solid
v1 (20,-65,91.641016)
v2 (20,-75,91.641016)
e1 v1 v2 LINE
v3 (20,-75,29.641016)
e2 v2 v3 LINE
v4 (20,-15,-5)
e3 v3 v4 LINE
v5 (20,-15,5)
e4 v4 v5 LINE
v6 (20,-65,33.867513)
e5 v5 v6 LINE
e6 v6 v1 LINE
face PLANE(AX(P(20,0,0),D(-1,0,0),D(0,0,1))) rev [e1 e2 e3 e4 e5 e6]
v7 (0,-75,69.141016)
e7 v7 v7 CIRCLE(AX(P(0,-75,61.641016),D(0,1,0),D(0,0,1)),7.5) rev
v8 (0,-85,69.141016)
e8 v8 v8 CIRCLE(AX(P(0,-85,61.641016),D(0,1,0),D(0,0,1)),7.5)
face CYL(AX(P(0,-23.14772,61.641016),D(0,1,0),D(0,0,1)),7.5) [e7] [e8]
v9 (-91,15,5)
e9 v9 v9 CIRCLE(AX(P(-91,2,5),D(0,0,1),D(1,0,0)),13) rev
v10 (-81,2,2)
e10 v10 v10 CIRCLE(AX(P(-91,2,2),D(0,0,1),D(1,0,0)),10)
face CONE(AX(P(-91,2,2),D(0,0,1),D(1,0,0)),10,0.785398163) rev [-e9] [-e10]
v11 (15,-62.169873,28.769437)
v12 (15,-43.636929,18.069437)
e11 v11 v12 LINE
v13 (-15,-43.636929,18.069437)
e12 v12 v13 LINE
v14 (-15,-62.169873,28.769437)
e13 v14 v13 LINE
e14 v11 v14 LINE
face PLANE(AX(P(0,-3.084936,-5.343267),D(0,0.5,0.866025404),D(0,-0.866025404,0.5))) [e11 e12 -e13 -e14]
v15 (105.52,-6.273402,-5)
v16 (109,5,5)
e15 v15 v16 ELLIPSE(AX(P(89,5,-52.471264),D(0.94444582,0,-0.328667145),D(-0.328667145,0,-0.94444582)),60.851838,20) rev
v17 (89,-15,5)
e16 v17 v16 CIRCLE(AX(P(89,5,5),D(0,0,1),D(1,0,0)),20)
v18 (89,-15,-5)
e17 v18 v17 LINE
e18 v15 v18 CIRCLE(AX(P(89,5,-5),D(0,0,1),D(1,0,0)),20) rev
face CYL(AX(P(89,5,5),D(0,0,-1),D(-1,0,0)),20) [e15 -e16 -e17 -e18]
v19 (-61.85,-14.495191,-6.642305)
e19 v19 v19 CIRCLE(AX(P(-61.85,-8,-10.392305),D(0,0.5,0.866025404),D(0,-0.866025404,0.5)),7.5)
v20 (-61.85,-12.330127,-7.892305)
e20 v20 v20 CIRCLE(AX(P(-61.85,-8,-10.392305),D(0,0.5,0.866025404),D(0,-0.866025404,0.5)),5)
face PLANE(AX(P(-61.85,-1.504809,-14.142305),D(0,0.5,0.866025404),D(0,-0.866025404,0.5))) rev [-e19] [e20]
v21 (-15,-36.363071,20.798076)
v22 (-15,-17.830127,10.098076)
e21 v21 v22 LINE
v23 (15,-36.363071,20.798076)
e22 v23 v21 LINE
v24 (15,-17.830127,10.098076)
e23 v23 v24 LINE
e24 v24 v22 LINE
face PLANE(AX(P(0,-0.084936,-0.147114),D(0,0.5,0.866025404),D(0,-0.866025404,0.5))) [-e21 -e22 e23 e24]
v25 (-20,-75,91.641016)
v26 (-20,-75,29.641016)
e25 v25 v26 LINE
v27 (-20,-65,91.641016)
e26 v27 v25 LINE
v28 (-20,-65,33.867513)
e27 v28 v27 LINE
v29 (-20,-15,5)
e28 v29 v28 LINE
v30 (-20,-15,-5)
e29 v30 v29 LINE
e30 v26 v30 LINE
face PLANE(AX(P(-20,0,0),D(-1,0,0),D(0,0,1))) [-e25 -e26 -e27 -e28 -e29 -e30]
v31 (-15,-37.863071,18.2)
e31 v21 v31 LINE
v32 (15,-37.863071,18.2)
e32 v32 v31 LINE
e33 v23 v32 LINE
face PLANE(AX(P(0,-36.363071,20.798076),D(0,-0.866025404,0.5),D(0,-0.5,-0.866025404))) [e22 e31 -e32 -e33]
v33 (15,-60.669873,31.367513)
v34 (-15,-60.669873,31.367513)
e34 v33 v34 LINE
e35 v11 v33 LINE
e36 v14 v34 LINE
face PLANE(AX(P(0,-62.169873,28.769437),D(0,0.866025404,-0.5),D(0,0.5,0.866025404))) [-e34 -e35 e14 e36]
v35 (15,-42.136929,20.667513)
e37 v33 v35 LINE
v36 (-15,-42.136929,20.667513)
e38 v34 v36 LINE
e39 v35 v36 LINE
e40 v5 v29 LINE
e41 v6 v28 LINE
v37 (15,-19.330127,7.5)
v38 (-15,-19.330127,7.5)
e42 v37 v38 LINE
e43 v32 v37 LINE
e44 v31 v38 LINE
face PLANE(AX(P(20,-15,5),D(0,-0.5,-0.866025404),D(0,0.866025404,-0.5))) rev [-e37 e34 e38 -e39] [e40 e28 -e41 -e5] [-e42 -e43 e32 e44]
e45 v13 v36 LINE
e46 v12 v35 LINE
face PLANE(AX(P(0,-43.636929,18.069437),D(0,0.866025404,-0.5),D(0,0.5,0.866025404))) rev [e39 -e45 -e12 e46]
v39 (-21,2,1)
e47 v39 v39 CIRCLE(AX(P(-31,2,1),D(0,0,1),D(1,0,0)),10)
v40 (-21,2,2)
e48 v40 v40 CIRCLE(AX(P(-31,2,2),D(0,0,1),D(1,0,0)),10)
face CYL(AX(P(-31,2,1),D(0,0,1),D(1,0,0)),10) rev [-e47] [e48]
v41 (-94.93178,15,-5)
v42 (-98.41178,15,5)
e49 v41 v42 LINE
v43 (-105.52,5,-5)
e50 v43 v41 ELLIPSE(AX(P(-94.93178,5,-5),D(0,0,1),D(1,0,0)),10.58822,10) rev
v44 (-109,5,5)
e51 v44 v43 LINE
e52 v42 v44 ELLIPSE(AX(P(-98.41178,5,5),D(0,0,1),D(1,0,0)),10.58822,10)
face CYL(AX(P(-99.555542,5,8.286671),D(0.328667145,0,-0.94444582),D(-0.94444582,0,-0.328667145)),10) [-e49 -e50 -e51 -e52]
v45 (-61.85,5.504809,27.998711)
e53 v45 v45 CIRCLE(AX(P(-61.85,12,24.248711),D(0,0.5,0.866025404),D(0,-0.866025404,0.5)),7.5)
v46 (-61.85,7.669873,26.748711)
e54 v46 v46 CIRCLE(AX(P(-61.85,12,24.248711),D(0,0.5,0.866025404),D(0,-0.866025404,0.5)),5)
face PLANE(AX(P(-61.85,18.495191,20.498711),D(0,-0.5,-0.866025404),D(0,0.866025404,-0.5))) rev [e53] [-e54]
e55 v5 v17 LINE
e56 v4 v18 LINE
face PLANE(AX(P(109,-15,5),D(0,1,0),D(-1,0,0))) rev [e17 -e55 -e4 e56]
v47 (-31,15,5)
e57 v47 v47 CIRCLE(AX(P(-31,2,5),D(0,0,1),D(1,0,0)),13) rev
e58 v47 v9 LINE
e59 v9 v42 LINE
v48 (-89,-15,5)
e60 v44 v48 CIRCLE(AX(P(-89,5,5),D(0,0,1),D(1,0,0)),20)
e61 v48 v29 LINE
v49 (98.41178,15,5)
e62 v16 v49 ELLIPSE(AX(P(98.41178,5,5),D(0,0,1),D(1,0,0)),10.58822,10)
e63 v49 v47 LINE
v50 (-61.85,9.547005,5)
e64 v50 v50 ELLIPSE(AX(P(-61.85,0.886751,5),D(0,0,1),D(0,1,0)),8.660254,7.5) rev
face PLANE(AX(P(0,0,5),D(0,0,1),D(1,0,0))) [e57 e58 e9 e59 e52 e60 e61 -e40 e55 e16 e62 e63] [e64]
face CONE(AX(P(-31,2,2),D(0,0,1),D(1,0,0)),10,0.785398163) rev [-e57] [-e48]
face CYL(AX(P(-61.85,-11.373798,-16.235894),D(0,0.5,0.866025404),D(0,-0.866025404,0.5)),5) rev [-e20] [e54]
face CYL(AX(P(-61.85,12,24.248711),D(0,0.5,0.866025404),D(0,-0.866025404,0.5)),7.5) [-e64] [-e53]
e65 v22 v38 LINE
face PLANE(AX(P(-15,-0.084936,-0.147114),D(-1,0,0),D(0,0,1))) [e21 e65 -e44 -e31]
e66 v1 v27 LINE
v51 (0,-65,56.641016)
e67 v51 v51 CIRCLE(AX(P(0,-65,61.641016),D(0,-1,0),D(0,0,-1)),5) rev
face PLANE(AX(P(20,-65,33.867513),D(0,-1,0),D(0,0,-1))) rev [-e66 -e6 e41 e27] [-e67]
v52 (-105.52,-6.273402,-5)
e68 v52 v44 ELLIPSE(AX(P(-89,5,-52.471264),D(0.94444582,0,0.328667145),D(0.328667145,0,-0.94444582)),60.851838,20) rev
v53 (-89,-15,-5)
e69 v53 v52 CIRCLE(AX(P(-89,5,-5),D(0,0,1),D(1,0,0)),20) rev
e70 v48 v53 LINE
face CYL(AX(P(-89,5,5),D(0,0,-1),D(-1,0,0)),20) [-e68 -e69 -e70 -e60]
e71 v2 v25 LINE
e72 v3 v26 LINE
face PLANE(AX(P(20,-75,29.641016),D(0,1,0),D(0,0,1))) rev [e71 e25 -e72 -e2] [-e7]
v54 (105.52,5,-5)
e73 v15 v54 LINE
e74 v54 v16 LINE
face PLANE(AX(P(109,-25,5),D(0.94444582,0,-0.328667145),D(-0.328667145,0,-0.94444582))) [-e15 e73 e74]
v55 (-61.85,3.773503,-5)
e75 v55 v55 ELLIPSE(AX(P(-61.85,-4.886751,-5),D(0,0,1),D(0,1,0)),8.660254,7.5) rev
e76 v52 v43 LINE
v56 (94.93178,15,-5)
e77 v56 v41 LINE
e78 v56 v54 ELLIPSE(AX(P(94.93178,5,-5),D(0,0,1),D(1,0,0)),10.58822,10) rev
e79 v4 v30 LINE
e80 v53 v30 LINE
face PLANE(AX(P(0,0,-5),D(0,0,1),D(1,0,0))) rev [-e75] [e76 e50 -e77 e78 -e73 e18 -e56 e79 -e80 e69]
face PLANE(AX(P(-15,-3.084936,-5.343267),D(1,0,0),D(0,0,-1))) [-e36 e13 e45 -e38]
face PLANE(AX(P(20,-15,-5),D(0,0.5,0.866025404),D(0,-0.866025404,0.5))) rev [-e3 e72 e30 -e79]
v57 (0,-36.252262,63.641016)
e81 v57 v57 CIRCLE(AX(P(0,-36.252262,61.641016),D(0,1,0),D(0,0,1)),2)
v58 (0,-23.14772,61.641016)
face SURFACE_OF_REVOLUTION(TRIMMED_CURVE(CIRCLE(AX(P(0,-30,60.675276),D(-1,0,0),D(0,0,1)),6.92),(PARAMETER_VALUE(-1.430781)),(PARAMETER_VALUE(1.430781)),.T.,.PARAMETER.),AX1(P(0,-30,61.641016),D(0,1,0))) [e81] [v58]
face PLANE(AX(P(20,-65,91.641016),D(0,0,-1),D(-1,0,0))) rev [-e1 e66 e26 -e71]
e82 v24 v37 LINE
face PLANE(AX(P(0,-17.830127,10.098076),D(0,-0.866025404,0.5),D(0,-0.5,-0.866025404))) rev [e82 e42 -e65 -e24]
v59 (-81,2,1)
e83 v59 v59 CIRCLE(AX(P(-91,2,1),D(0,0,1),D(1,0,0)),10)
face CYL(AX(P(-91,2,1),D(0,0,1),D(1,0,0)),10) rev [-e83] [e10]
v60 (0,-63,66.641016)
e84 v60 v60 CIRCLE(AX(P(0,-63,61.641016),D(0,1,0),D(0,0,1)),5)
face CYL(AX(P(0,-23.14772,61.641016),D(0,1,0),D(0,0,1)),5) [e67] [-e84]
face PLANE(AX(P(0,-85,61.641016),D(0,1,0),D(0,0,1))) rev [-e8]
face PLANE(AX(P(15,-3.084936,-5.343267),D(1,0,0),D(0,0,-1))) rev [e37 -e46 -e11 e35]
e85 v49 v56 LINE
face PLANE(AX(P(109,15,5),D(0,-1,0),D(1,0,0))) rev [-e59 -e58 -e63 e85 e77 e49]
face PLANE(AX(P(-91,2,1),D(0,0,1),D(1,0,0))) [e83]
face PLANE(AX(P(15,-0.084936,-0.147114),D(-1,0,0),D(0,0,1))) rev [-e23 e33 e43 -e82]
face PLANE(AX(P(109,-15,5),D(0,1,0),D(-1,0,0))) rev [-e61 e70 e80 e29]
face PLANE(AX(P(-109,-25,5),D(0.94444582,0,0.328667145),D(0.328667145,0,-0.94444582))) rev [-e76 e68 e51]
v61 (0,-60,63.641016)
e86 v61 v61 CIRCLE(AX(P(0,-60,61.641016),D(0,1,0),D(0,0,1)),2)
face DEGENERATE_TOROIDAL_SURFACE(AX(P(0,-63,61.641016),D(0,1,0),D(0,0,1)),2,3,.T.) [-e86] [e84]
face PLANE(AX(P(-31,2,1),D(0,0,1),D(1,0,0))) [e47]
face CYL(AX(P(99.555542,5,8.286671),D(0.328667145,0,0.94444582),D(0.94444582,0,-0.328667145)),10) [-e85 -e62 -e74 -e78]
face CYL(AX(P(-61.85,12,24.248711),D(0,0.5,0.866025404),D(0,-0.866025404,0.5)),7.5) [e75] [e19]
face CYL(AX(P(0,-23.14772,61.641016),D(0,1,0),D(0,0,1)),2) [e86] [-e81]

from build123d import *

# Parameters (mm, degrees)
IZIM1_W                     = 218
IZIM1_H                     = 30
Y_KSEKLIK_EKSTR_ZYON1_DEPTH = 5
RADYUS1_R                   = 20
IZIM3_R                     = 10
KES_EKSTR_ZYON1_DEPTH       = 4
PAH1_SIZE                   = 3
IZIM5_R                     = 5
KES_EKSTR_ZYON3_DEPTH       = 119.749210232
Y_KSEKLIK_EKSTR_ZYON2_DEPTH = 20
IZIM9_W                     = 30
IZIM9_H                     = 21.4
Y_KSEKLIK_EKSTR_ZYON3_DEPTH = 3
IZIM9_3_W                   = 30
IZIM9_3_H                   = 21.4
KES_EKSTR_ZYON4_DEPTH       = 3
KES_EKSTR_ZYON5_DEPTH       = 40
RADYUS2_R                   = 10
RADYUS2_OF_AYNALAMA1_R      = 10


with BuildPart() as part:
    # Çizim1 → Yükseklik-Ekstrüzyon1 (new, symmetric)
    with BuildSketch(Plane.XY):
        Rectangle(IZIM1_W, IZIM1_H)
    extrude(amount=Y_KSEKLIK_EKSTR_ZYON1_DEPTH, both=True)

    # Radyus1
    radyus1_edges = [part.edges().sort_by_distance(p)[0] for p in [
        (109, -15, 0),
        (-109, -15, 0),
    ]]
    fillet(radyus1_edges, radius=RADYUS1_R)

    # Çizim3 → Kes-Ekstrüzyon1 (cut)
    with BuildSketch(Plane.XY.offset(5)):
        with Locations((-91, 2)):
            Circle(IZIM3_R)
        with Locations((-31, 2)):
            Circle(IZIM3_R)
    extrude(amount=-KES_EKSTR_ZYON1_DEPTH, mode=Mode.SUBTRACT)

    # Pah1
    pah1_edges = [part.edges().sort_by_distance(p)[0] for p in [
        (-101, 2, 5),
        (-41, 2, 5),
    ]]
    chamfer(pah1_edges, length=PAH1_SIZE - 0.0001)  # a hair under: the kernel refuses the full size

    # Çizim4 → Döndür1 (revolve)
    with BuildSketch(Plane(origin=(-61.85, 0, 0), x_dir=(0, 0, -1), z_dir=(1, 0, 0)), mode=Mode.PRIVATE) as d_nd_r1_sk:
        Polygon((-20.498711306, 18.495190528), (-24.248711306, 12), (10.392304845, -8), (14.142304845, -1.504809472), align=None)
    revolve(d_nd_r1_sk.sketch.rotate(Axis((-61.85, 12, 24.248711306), (0, -0.49999999999999767, -0.86602540378444)), 180), axis=Axis((-61.85, 12, 24.248711306), (0, -0.49999999999999767, -0.86602540378444)))

    # Çizim5 → Kes-Ekstrüzyon3 (cut, through all)
    with BuildSketch(Plane(origin=(0, 13.5, 23.382685902), x_dir=(1, 0, 0), z_dir=(0, 0.4999999999999978, 0.86602540378444))):
        with Locations(Location((-61.85, -1.732050808, 0), (0, 0, 270))):
            Circle(IZIM5_R)
    extrude(amount=-KES_EKSTR_ZYON3_DEPTH, mode=Mode.SUBTRACT)

    # Çizim7 → Yükseklik-Ekstrüzyon2 (add, symmetric)
    with BuildSketch(Plane(origin=(0, 0, 0), x_dir=(0, 0, -1), z_dir=(1, 0, 0))):
        Polygon((5, -15), (-5, -15), (-33.867513459, -65), (-91.641016151, -65), (-91.641016151, -75), (-29.641016151, -75), align=None)
    extrude(amount=Y_KSEKLIK_EKSTR_ZYON2_DEPTH, both=True)

    # Çizim9 → Yükseklik-Ekstrüzyon3 (add)
    with BuildSketch(Plane(origin=(0, -1.584936491, -2.745190528), x_dir=(1, 0, 0), z_dir=(0, 0.4999999999999977, 0.86602540378444))):
        with Locations((0, -31.190381057)):
            Rectangle(IZIM9_W, IZIM9_H)
    extrude(amount=Y_KSEKLIK_EKSTR_ZYON3_DEPTH)

    # Çizim9<3> → Kes-Ekstrüzyon4 (cut)
    with BuildSketch(Plane(origin=(0, -1.584936491, -2.745190528), x_dir=(1, 0, 0), z_dir=(0, 0.4999999999999977, 0.86602540378444))):
        with Locations((0, -57.525407976)):
            Rectangle(IZIM9_3_W, IZIM9_3_H)
    extrude(amount=-KES_EKSTR_ZYON4_DEPTH, mode=Mode.SUBTRACT)

    # Çizim11 → Döndür2 (revolve)
    with BuildSketch(Plane(origin=(0, 0, 0), x_dir=(0, 0, -1), z_dir=(1, 0, 0)), mode=Mode.PRIVATE) as d_nd_r2_sk:
        with BuildLine():
            Line((-61.641016151, -23.147719704), (-61.641016151, -85))
            Line((-61.641016151, -85), (-54.141016151, -85))
            Line((-54.141016151, -85), (-54.141016151, -75))
            Line((-54.141016151, -75), (-56.641016151, -75))
            Line((-56.641016151, -75), (-56.641016151, -63))
            ThreePointArc((-56.641016151, -63), (-57.519695808, -60.878679656), (-59.641016151, -60))
            Line((-59.641016151, -60), (-59.641016151, -36.252262247))
            ThreePointArc((-59.641016151, -36.252262247), (-55.765967633, -28.955966756), (-61.641016151, -23.147719704))
        make_face()
    revolve(d_nd_r2_sk.sketch.rotate(Axis((0, -23.147719704, 61.641016151), (0, -1, 0)), 180), axis=Axis((0, -23.147719704, 61.641016151), (0, -1, 0)))

    # Çizim12 → Kes-Ekstrüzyon5 (cut)
    with BuildSketch(Plane(origin=(0, 15, 0), x_dir=(1, 0, 0), z_dir=(0, 1, 0))):
        Polygon((-109, 5), (-109, -5), (-105.52, 5), align=None)
    kes_ekstr_zyon5 = extrude(amount=-KES_EKSTR_ZYON5_DEPTH, mode=Mode.SUBTRACT)

    # Radyus2
    radyus2_edges = [part.edges().sort_by_distance(p)[0] for p in [
        (-107.26, 15, 0),
    ]]
    fillet(radyus2_edges, radius=RADYUS2_R)

    # Aynalama1: Kes-Ekstrüzyon5 across plane
    add(kes_ekstr_zyon5.mirror(Plane(origin=(0, 0, 0), x_dir=(0, 0, 1), z_dir=(1, 0, 0))), mode=Mode.SUBTRACT)

    # Radyus2 of Aynalama1
    radyus2_of_aynalama1_edges = [part.edges().sort_by_distance(p)[0] for p in [
        (107.26, 15, 0),
    ]]
    fillet(radyus2_of_aynalama1_edges, radius=RADYUS2_OF_AYNALAMA1_R)


solid = part.part
